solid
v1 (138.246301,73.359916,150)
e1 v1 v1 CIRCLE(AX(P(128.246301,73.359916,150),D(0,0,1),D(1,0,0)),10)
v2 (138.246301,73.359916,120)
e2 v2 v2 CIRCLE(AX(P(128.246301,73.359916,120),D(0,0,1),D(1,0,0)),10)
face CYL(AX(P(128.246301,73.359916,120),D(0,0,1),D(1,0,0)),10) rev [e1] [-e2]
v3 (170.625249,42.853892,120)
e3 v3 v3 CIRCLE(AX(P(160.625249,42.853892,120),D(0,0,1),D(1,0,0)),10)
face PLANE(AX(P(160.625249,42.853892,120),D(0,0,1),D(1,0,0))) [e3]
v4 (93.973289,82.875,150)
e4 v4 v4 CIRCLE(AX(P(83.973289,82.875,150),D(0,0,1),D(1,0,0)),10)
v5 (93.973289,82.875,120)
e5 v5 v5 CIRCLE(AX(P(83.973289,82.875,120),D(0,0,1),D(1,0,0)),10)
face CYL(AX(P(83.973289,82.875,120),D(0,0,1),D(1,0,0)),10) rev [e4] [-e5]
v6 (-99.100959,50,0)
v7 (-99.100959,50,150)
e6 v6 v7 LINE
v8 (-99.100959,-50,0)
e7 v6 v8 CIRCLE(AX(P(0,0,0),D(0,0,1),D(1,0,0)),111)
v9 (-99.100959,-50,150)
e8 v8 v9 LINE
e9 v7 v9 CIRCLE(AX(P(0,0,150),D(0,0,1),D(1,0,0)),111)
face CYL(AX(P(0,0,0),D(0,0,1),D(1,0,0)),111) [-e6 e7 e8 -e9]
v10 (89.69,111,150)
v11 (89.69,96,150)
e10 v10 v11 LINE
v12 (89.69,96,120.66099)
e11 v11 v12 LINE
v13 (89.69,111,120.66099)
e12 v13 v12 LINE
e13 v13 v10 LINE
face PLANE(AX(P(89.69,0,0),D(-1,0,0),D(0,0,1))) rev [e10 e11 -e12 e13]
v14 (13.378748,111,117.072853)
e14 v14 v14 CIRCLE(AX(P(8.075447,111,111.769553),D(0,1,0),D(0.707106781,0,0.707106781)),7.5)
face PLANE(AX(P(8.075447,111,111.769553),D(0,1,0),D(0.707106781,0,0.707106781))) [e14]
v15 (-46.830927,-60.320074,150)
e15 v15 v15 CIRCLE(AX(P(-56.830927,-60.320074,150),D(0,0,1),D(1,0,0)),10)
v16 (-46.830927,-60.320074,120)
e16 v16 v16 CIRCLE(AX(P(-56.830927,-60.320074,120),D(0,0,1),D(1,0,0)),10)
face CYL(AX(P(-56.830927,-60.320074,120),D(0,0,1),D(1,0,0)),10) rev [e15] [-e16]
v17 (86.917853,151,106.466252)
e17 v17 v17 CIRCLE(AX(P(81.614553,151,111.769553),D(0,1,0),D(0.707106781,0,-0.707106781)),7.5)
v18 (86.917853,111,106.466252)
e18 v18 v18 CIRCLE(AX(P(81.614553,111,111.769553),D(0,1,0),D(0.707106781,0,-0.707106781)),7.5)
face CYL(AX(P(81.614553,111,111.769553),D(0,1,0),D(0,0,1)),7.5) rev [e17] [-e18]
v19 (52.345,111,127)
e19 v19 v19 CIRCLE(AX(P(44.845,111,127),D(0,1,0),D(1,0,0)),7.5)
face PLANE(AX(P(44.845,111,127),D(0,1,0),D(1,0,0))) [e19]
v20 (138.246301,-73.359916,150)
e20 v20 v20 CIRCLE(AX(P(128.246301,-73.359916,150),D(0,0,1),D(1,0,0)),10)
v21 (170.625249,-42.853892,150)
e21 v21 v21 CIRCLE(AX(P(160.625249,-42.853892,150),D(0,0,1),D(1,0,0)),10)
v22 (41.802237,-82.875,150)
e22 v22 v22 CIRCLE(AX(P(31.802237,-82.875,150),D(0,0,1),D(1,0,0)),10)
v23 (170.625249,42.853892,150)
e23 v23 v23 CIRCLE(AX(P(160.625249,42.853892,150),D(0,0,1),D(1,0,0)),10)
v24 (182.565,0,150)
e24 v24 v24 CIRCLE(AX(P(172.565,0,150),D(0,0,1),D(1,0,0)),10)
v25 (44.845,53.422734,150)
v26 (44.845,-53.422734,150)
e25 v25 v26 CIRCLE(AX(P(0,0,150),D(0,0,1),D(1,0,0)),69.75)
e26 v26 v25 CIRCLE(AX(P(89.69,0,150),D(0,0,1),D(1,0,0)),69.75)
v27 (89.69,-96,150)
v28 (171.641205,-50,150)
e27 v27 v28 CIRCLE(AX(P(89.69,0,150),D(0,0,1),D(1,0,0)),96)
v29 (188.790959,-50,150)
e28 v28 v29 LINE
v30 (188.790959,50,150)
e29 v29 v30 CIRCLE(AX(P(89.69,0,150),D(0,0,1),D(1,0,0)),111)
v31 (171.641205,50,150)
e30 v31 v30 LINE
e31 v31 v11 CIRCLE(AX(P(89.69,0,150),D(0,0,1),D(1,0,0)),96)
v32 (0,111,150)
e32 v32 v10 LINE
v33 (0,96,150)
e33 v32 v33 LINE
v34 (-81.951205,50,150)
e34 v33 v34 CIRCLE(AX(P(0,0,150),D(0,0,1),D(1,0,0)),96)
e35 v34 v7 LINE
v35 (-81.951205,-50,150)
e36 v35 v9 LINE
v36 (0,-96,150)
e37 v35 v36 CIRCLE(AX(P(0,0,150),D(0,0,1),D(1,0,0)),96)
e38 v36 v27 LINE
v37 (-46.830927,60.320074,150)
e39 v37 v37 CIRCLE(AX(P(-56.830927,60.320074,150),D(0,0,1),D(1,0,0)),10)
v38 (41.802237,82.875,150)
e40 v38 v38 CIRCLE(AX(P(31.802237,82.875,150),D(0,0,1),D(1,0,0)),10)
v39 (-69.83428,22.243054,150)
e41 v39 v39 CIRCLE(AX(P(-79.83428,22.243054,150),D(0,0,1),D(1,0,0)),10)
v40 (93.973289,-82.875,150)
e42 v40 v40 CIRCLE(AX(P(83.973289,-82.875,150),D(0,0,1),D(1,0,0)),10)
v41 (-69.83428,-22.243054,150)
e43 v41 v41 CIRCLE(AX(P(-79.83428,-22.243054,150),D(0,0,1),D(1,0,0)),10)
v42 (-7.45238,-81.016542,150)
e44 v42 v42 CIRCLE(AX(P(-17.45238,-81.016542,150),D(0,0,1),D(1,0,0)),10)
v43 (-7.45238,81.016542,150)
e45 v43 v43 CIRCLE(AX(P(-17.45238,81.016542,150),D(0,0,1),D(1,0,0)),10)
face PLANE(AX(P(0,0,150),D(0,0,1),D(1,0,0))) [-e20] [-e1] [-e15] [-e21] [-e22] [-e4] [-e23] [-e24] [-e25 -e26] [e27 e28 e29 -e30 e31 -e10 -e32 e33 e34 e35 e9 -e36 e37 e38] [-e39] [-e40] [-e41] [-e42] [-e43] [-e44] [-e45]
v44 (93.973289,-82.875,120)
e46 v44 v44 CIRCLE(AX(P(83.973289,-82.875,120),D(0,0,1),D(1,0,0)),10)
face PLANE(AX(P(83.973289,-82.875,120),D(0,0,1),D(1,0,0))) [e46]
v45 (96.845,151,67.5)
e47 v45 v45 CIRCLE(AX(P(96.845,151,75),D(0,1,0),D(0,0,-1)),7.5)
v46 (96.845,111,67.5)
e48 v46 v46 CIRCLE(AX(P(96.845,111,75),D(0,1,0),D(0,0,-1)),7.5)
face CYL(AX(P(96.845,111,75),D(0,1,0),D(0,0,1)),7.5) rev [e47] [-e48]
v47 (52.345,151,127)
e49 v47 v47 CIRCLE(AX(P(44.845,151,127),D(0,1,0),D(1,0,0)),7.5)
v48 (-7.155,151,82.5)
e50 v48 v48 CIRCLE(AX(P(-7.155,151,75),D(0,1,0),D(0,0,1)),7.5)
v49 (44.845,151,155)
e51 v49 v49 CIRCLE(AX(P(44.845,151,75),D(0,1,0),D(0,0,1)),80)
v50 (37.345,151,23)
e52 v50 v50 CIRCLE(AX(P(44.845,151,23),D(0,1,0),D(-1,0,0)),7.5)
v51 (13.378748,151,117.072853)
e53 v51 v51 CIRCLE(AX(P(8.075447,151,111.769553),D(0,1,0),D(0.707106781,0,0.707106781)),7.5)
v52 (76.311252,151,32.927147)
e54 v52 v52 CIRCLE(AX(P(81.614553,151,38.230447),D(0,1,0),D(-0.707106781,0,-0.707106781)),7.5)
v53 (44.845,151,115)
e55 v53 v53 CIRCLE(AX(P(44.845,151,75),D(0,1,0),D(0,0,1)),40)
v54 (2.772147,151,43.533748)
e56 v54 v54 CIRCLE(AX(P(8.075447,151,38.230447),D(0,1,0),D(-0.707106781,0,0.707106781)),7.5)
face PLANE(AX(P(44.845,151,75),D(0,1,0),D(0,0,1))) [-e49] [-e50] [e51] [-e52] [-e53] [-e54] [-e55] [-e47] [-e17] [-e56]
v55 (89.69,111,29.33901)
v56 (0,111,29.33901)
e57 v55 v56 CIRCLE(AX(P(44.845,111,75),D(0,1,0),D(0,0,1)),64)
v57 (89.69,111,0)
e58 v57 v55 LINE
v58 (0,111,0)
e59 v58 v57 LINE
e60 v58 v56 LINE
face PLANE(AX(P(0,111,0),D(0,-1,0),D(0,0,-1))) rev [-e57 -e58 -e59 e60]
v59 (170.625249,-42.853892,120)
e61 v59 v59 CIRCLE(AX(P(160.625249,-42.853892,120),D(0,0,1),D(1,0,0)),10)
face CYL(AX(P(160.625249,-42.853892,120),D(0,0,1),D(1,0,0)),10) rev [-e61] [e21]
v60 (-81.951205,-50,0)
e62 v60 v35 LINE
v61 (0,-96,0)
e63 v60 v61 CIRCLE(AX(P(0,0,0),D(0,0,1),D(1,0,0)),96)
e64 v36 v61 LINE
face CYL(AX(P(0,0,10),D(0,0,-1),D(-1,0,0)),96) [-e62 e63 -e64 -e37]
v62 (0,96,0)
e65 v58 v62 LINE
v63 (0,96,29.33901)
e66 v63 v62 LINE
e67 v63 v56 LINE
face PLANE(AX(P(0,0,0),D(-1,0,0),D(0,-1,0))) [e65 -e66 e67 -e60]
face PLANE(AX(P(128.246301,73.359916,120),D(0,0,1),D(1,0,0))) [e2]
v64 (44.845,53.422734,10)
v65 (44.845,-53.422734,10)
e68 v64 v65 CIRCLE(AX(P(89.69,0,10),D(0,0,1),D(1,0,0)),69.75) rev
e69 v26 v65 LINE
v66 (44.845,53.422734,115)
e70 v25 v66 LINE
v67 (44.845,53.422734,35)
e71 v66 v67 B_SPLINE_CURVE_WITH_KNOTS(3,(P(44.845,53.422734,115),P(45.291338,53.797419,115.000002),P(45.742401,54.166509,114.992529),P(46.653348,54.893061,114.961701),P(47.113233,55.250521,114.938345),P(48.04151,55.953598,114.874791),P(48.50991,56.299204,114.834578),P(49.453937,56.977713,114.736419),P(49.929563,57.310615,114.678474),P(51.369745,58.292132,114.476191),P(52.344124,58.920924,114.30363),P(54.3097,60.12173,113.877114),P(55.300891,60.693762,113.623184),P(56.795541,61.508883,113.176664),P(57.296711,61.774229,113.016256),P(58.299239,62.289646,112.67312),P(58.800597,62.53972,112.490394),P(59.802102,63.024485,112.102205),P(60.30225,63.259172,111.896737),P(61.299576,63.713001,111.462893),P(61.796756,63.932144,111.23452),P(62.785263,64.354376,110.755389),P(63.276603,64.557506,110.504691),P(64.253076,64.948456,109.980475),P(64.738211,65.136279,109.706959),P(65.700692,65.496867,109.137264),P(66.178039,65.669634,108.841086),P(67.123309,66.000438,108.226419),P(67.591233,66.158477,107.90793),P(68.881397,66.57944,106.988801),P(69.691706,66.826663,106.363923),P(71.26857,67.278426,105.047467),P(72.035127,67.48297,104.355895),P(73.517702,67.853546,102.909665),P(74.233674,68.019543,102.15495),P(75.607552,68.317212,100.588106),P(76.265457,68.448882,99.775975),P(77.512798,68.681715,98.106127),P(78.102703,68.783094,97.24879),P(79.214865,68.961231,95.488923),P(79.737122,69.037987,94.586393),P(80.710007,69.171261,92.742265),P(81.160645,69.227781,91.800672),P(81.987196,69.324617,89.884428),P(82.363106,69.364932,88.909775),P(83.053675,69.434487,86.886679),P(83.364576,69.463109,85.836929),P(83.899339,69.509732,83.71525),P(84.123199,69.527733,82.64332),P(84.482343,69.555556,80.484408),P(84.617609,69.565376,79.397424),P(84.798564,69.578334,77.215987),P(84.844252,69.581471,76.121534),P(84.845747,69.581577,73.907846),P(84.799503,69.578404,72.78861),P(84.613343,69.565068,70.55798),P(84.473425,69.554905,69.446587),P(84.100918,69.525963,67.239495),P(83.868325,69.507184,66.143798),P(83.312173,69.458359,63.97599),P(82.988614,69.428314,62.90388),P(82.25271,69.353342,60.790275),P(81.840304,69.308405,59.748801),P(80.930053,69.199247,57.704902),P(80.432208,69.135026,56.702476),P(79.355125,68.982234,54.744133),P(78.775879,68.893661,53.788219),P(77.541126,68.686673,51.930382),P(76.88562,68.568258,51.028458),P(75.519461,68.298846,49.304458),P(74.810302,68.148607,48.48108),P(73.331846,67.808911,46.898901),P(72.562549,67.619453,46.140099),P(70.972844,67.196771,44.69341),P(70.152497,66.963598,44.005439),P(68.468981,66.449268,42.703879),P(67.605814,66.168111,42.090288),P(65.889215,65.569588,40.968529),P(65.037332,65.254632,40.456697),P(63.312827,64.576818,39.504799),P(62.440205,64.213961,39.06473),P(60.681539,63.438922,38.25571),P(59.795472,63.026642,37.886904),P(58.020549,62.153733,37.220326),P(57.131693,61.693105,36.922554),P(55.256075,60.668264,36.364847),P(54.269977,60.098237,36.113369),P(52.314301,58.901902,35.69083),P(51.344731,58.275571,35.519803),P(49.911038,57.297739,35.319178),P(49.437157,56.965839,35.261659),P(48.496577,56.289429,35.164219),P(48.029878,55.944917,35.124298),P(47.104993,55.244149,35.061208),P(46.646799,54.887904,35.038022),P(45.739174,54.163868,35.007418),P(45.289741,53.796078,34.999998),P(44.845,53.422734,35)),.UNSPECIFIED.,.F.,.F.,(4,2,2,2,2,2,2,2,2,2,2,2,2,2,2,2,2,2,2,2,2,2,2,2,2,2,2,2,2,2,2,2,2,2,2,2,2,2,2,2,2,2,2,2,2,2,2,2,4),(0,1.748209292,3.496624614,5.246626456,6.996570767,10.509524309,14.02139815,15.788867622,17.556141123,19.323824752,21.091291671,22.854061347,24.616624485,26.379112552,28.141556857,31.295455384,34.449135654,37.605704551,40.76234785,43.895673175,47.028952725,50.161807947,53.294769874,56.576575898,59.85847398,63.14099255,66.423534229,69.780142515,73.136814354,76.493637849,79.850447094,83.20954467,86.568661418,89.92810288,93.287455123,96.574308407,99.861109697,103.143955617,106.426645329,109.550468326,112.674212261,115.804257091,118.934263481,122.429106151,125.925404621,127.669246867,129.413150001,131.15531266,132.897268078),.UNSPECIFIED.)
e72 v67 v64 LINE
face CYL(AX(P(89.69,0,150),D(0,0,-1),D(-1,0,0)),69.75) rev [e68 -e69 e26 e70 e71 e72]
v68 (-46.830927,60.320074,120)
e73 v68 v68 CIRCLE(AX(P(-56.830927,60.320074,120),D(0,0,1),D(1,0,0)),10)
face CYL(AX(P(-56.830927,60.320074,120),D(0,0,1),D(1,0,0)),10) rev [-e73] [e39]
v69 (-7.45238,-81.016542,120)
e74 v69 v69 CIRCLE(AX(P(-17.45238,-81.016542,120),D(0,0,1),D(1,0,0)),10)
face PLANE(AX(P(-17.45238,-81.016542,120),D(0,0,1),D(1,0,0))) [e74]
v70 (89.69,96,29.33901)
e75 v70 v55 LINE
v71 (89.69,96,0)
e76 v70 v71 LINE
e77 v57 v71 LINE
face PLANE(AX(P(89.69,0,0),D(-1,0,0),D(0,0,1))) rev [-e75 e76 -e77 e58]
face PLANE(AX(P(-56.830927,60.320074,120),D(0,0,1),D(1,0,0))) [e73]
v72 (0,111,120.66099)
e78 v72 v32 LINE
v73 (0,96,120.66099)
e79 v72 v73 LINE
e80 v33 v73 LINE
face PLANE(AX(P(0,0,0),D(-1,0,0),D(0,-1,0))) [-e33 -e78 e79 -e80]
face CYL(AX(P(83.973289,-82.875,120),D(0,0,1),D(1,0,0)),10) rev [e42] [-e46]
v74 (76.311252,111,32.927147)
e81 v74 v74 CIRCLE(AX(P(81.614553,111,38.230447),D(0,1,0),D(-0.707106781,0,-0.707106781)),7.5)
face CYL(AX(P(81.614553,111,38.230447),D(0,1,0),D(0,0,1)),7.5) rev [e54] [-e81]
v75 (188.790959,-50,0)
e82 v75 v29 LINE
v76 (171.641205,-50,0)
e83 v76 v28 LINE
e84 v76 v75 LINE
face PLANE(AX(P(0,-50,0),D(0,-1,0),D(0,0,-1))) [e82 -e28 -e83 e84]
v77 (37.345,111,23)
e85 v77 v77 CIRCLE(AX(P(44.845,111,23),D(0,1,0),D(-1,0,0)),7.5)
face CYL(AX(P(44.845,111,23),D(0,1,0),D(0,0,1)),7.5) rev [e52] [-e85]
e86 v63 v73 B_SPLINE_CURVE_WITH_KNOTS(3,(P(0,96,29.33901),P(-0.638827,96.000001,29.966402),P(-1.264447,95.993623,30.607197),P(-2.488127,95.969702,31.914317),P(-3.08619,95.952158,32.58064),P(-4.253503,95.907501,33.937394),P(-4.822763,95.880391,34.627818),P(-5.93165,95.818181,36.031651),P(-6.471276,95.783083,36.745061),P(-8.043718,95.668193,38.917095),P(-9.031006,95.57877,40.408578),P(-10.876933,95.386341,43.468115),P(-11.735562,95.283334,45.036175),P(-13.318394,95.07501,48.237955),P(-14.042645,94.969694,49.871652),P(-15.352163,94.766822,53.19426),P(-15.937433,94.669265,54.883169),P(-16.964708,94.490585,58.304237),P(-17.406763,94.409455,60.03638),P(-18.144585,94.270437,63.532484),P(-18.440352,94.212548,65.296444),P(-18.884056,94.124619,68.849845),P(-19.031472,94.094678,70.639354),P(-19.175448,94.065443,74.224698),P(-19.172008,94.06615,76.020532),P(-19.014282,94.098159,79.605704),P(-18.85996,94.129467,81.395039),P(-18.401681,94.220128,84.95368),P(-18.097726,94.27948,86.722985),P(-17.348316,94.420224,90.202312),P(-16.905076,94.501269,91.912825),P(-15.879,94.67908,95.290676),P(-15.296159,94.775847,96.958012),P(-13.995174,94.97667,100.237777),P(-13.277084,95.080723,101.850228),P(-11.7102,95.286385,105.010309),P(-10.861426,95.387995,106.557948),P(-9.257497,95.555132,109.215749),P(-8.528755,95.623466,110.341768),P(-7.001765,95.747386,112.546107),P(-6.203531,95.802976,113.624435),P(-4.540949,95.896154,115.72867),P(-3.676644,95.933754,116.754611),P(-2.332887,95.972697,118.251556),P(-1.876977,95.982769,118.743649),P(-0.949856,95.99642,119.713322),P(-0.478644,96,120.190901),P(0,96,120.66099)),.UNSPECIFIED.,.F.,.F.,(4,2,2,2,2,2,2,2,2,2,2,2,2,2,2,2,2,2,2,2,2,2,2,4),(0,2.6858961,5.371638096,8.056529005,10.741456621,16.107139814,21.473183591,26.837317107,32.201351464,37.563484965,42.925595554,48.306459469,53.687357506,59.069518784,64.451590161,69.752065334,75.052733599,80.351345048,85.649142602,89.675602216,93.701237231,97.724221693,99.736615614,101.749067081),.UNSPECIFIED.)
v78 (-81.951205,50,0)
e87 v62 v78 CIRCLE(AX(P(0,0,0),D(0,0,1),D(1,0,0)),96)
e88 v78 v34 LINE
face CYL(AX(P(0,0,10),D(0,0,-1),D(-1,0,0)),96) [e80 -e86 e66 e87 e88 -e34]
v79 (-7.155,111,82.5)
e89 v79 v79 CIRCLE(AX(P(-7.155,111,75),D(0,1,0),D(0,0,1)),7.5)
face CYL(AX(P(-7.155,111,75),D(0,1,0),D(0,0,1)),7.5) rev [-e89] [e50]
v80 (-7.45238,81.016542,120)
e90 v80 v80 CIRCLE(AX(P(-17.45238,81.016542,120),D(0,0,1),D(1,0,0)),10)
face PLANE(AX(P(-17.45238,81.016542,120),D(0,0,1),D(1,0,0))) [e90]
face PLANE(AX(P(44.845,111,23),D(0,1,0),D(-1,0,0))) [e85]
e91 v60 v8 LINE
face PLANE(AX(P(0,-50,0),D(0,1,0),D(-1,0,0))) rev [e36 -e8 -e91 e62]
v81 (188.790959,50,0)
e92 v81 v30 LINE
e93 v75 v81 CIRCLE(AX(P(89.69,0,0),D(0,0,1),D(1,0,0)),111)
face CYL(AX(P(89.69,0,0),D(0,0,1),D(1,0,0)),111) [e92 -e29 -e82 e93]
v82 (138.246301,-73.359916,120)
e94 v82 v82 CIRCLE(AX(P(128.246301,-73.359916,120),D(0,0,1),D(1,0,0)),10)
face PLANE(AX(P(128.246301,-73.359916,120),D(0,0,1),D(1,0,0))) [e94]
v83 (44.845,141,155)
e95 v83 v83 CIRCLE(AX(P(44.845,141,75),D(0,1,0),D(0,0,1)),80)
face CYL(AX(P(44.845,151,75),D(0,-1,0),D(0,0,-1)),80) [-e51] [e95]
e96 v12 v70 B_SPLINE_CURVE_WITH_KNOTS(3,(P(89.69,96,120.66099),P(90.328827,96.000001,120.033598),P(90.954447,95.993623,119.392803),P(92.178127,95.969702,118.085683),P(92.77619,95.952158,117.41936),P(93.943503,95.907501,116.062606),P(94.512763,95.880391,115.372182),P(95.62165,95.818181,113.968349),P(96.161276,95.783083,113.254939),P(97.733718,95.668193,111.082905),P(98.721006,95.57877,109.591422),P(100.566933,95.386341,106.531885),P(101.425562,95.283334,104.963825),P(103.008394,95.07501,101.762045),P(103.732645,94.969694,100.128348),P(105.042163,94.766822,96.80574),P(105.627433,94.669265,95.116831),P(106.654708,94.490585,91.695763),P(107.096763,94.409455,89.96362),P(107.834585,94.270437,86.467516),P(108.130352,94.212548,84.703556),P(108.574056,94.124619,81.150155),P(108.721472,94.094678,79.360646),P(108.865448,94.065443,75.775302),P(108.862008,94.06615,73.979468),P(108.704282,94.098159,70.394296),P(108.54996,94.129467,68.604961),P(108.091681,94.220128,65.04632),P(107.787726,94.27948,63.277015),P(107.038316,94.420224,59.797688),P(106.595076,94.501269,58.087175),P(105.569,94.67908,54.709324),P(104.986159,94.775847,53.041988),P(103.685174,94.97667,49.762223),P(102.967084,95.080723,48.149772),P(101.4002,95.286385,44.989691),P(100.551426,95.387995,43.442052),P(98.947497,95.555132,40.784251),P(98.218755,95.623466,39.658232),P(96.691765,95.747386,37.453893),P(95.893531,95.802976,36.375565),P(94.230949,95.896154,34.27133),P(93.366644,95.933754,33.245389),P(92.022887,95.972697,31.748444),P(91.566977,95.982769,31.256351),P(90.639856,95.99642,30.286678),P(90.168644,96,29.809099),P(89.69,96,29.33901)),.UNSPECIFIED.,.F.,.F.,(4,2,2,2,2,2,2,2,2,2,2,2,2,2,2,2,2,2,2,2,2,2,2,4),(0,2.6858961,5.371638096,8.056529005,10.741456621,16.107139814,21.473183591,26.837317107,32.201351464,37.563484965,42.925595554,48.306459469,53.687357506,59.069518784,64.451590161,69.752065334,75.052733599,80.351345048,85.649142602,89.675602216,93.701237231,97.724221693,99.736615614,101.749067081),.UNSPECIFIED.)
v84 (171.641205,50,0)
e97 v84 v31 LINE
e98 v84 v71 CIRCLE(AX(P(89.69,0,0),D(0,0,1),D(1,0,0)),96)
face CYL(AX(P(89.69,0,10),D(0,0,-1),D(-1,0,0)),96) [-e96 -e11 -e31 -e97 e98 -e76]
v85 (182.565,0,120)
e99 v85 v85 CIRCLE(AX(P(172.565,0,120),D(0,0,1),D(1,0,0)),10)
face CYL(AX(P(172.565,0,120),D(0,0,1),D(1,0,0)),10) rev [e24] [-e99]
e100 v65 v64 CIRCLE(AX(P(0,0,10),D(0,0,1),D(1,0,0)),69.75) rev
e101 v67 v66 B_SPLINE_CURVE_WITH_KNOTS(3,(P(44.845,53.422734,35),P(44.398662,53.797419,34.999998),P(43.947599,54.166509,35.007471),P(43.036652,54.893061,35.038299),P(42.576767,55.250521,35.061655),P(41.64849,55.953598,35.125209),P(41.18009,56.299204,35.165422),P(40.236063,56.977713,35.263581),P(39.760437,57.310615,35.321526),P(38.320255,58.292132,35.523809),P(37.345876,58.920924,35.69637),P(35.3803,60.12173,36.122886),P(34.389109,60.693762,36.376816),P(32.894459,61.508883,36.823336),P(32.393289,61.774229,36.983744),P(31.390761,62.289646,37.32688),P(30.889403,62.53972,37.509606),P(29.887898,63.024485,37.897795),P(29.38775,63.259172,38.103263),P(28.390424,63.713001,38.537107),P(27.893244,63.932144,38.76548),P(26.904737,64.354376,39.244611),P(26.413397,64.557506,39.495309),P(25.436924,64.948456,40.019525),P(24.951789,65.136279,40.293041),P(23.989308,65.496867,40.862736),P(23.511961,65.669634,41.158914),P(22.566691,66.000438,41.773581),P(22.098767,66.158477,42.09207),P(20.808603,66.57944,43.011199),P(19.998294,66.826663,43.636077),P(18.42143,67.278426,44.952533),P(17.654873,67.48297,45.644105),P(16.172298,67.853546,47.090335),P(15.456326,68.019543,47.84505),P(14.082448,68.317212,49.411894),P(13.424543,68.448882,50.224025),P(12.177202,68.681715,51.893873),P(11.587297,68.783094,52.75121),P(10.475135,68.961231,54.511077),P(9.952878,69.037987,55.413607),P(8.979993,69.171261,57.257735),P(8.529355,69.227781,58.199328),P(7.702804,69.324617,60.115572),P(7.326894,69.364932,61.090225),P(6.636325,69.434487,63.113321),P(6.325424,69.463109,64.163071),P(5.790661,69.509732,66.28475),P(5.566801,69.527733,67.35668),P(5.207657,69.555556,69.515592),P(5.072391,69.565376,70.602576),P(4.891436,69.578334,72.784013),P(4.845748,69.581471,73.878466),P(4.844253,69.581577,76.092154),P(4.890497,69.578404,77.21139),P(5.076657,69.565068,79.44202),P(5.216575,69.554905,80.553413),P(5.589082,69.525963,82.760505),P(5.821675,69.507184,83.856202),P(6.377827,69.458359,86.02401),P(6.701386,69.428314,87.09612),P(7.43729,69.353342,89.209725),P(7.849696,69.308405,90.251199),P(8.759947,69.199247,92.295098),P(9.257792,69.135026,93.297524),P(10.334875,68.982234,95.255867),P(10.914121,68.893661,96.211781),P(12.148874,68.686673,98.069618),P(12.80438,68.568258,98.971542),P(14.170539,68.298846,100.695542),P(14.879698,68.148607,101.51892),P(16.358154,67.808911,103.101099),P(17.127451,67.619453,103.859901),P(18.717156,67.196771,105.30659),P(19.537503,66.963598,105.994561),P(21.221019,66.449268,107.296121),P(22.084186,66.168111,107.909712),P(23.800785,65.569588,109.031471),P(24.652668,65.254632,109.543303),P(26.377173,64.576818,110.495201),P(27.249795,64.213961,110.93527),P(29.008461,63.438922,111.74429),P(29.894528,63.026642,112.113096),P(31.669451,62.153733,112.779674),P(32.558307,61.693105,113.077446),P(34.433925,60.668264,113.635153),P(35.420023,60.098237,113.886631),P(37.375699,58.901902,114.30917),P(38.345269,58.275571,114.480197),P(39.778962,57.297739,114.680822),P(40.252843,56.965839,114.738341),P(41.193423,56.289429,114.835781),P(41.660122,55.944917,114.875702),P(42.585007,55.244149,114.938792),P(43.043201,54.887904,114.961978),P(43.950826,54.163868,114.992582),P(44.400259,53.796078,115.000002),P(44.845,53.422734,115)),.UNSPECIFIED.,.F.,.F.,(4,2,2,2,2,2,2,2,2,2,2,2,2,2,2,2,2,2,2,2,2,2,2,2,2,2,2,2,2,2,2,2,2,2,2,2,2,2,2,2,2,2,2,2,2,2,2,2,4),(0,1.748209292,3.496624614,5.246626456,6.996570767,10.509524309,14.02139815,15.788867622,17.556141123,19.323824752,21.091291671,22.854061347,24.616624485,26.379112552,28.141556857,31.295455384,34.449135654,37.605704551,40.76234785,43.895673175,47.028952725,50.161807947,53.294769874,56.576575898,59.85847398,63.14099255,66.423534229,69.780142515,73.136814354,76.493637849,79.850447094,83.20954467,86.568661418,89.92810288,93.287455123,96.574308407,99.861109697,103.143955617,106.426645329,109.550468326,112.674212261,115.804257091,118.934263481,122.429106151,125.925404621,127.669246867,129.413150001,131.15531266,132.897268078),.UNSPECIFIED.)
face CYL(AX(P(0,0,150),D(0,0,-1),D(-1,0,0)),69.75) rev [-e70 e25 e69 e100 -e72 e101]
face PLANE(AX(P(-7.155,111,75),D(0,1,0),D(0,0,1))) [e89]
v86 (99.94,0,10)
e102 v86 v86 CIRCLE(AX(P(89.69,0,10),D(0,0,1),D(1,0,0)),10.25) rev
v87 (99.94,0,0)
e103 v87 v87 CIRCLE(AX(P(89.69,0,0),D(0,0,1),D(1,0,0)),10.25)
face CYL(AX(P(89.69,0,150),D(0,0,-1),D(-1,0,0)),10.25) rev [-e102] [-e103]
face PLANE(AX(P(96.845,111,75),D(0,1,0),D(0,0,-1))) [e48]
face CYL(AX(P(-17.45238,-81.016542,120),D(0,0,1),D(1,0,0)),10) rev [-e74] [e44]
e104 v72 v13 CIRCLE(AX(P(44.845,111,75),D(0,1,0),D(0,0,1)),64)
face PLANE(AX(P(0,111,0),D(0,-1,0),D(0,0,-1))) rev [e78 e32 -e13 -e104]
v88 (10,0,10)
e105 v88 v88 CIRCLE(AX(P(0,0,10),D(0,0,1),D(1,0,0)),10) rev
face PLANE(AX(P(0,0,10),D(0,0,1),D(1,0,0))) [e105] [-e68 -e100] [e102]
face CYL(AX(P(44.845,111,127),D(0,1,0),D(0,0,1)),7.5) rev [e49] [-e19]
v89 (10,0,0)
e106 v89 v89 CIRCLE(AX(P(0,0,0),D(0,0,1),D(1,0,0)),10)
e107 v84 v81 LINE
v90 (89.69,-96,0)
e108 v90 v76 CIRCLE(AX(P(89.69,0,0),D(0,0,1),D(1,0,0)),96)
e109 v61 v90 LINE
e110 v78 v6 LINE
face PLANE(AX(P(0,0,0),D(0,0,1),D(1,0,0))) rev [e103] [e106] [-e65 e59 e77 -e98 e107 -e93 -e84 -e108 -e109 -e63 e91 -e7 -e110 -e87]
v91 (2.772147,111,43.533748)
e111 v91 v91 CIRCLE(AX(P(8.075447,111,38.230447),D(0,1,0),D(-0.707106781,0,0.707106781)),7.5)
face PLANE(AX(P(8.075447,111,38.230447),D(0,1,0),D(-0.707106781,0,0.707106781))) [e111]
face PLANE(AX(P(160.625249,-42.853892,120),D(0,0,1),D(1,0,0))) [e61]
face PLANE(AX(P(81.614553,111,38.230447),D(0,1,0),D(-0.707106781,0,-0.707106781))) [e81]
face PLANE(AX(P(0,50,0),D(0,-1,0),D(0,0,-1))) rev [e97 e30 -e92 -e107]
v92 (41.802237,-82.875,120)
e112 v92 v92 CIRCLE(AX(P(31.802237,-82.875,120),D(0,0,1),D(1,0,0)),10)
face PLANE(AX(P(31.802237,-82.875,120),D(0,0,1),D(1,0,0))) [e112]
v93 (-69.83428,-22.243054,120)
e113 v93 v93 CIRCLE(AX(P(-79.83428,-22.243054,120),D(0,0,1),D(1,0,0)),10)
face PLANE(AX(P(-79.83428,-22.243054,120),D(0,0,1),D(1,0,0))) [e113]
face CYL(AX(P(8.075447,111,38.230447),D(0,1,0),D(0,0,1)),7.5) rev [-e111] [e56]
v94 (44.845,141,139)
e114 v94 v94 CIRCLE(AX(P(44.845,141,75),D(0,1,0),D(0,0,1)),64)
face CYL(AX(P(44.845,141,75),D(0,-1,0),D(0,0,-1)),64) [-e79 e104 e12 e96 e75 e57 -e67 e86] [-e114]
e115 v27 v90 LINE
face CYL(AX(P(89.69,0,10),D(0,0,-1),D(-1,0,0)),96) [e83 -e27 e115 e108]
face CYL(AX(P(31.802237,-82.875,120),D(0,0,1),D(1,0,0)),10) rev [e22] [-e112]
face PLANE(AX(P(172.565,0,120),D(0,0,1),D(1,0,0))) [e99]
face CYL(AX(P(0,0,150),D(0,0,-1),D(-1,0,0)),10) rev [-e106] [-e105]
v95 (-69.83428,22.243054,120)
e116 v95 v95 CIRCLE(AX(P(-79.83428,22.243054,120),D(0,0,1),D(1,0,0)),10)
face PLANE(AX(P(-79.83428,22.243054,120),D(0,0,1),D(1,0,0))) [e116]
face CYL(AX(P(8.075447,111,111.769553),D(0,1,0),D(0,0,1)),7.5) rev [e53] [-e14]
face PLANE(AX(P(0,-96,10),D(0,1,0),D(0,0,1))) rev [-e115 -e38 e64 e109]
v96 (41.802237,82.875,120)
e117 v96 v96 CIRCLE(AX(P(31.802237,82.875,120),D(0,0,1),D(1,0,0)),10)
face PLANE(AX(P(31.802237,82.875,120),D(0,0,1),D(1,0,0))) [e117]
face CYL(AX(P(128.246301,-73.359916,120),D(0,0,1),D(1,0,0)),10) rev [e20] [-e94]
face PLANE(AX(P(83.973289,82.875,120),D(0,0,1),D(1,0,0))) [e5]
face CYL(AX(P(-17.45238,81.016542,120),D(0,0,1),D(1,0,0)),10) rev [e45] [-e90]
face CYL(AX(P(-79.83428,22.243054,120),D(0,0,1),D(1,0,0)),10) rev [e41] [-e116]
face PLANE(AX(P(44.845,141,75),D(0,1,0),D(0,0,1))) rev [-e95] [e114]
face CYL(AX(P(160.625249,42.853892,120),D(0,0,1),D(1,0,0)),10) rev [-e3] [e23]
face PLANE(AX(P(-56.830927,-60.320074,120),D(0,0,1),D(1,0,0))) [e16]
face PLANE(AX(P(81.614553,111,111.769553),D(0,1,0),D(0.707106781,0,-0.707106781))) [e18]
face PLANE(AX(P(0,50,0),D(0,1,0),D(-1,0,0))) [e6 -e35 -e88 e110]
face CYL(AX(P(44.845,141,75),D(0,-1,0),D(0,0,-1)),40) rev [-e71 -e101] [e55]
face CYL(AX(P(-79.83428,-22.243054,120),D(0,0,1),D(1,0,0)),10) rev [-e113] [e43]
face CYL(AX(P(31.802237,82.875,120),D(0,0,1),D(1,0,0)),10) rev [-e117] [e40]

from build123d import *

# Parameters (mm, degrees)
BOSS_EXTRUDE1_DEPTH   = 10
BOSS_EXTRUDE4_DEPTH   = 150
SKETCH2_5_R           = 10
SKETCH2_5_R_2         = 10.25
CUT_EXTRUDE2_DEPTH    = 258.287342
BOSS_EXTRUDE5_START   = -150
SKETCH4_W             = 89.69
SKETCH4_H             = 15
BOSS_EXTRUDE5_DEPTH   = 150
SKETCH5_R             = 10
CUT_EXTRUDE10_DEPTH   = 30
CRVPATTERN1_START     = 120
CRVPATTERN1_OUTLINE_R = 10
CRVPATTERN1_DEPTH     = 30
BOSS_EXTRUDE6_START   = -16.9304
SKETCH7_R             = 64
SKETCH7_R_2           = 40
BOSS_EXTRUDE6_DEPTH   = 46.9304
CUT_EXTRUDE11_REACH   = 327.001
SKETCH8_R             = 80
SKETCH8_R_2           = 40
BOSS_EXTRUDE7_DEPTH   = 10
SKETCH9_R             = 7.5
CUT_EXTRUDE12_DEPTH   = 40
CIRPATTERN1_COUNT     = 8


# Read off the part's stored shape, not the designer's step: CrvPattern1
with BuildPart() as part:
    # Sketch1 → Boss-Extrude1 (new body)
    with BuildSketch(Plane.XY):
        with BuildLine():
            Line((0, 96), (89.69, 96))
            ThreePointArc((89.69, 96), (185.69, 0), (89.69, -96))
            Line((89.69, -96), (0, -96))
            ThreePointArc((0, -96), (-96, 0), (0, 96))
        make_face()
    extrude(amount=BOSS_EXTRUDE1_DEPTH)

    # Sketch2 → Boss-Extrude4 (add)
    with BuildSketch(Plane.XY):
        with BuildLine():
            ThreePointArc((89.69, -96), (185.69, 0), (89.69, 96))
            Line((89.69, 96), (0, 96))
            ThreePointArc((0, 96), (-96, 0), (0, -96))
            Line((0, -96), (89.69, -96))
        make_face()
        with BuildLine():
            ThreePointArc((44.845, -53.422734), (-69.75, 0), (44.845, 53.422734))
            ThreePointArc((44.845, 53.422734), (119.161374, 63.217882), (159.44, 0))
            ThreePointArc((159.44, 0), (119.161374, -63.217882), (44.845, -53.422734))
        make_face(mode=Mode.SUBTRACT)
    extrude(amount=BOSS_EXTRUDE4_DEPTH)

    # Sketch2<5> → Cut-Extrude2 (cut, through all)
    with BuildSketch(Plane.XY):
        Circle(SKETCH2_5_R)
        with Locations((89.69, 0)):
            Circle(SKETCH2_5_R_2)
    extrude(amount=CUT_EXTRUDE2_DEPTH, mode=Mode.SUBTRACT)

    # Sketch4 → Boss-Extrude5 (add)
    with BuildSketch(Plane.XY.offset(150).offset(BOSS_EXTRUDE5_START)):
        with Locations((44.845, 103.5)):
            Rectangle(SKETCH4_W, SKETCH4_H)
        with BuildLine():
            Line((-81.951205, 50), (-99.100959, 50))
            ThreePointArc((-99.100959, 50), (-111, 0), (-99.100959, -50))
            Line((-99.100959, -50), (-81.951205, -50))
            ThreePointArc((-81.951205, -50), (-96, 0), (-81.951205, 50))
        make_face()
        with BuildLine():
            ThreePointArc((188.790959, -50), (200.69, 0), (188.790959, 50))
            Line((188.790959, 50), (171.641205, 50))
            ThreePointArc((171.641205, 50), (185.69, 0), (171.641205, -50))
            Line((171.641205, -50), (188.790959, -50))
        make_face()
    extrude(amount=BOSS_EXTRUDE5_DEPTH)

    # Sketch5 → Cut-Extrude10 (cut)
    with BuildSketch(Plane.XY.offset(150)):
        with Locations((172.565, 0)):
            Circle(SKETCH5_R)
    extrude(amount=-CUT_EXTRUDE10_DEPTH, mode=Mode.SUBTRACT)

    # CrvPattern1 outline → CrvPattern1 (cut)
    with BuildSketch(Plane.XY.offset(CRVPATTERN1_START)):
        with Locations((160.625249, 42.853892)):
            Circle(CRVPATTERN1_OUTLINE_R)
        with Locations((160.625249, -42.853892)):
            Circle(CRVPATTERN1_OUTLINE_R)
        with Locations((128.246301, -73.359916)):
            Circle(CRVPATTERN1_OUTLINE_R)
        with Locations((83.973289, -82.875)):
            Circle(CRVPATTERN1_OUTLINE_R)
        with Locations((31.802237, -82.875)):
            Circle(CRVPATTERN1_OUTLINE_R)
        with Locations((-17.45238, -81.016542)):
            Circle(CRVPATTERN1_OUTLINE_R)
        with Locations((-56.830927, -60.320074)):
            Circle(CRVPATTERN1_OUTLINE_R)
        with Locations((-79.83428, -22.243054)):
            Circle(CRVPATTERN1_OUTLINE_R)
        with Locations((-79.83428, 22.243054)):
            Circle(CRVPATTERN1_OUTLINE_R)
        with Locations((-56.830927, 60.320074)):
            Circle(CRVPATTERN1_OUTLINE_R)
        with Locations((-17.45238, 81.016542)):
            Circle(CRVPATTERN1_OUTLINE_R)
        with Locations((31.802237, 82.875)):
            Circle(CRVPATTERN1_OUTLINE_R)
        with Locations((83.973289, 82.875)):
            Circle(CRVPATTERN1_OUTLINE_R)
        with Locations((128.246301, 73.359916)):
            Circle(CRVPATTERN1_OUTLINE_R)
    extrude(amount=CRVPATTERN1_DEPTH, mode=Mode.SUBTRACT)

    # Sketch7 → Boss-Extrude6 (add)
    with BuildSketch(Plane(origin=(0, 111, 0), x_dir=(1, 0, 0), z_dir=(0, 1, 0)).offset(BOSS_EXTRUDE6_START)):
        with Locations(Location((44.845, -75, 0), (0, 0, 134.483443))):
            Circle(SKETCH7_R)
        with Locations(Location((44.845, -75, 0), (0, 0, 270))):
            Circle(SKETCH7_R_2, mode=Mode.SUBTRACT)
    extrude(amount=BOSS_EXTRUDE6_DEPTH)

    # Sketch7<2> → Cut-Extrude11 (cut, up to next)
    with BuildSketch(Plane(origin=(0, 111, 0), x_dir=(1, 0, 0), z_dir=(0, 1, 0)), mode=Mode.PRIVATE) as cut_extrude11_sk1:
        with BuildLine():
            ThreePointArc((84.845, -75), (79.637998, -55.265582), (65.372637, -40.669021))
            Line((65.372637, -40.669021), (24.317363, -109.330979))
            ThreePointArc((24.317363, -109.330979), (64.579418, -109.792998), (84.845, -75))
        make_face()
    cut_extrude11_tool1 = extrude(cut_extrude11_sk1.sketch, amount=-CUT_EXTRUDE11_REACH, mode=Mode.PRIVATE) & part.part
    # Sketch7<2> → Cut-Extrude11 (cut, up to next)
    with BuildSketch(Plane(origin=(0, 111, 0), x_dir=(1, 0, 0), z_dir=(0, 1, 0)), mode=Mode.PRIVATE) as cut_extrude11_sk2:
        with BuildLine():
            Line((24.317363, -109.330979), (65.372637, -40.669021))
            ThreePointArc((65.372637, -40.669021), (10.514021, -54.472363), (24.317363, -109.330979))
        make_face()
    cut_extrude11_tool2 = extrude(cut_extrude11_sk2.sketch, amount=-CUT_EXTRUDE11_REACH, mode=Mode.PRIVATE) & part.part
    # Sketch7<2> → Cut-Extrude11 (cut, up to next)
    with BuildSketch(Plane(origin=(0, 111, 0), x_dir=(1, 0, 0), z_dir=(0, 1, 0)), mode=Mode.PRIVATE) as cut_extrude11_sk3:
        with BuildLine():
            ThreePointArc((84.845, -75), (79.637998, -55.265582), (65.372637, -40.669021))
            Line((65.372637, -40.669021), (24.317363, -109.330979))
            ThreePointArc((24.317363, -109.330979), (64.579418, -109.792998), (84.845, -75))
        make_face()
    cut_extrude11_tool3 = extrude(cut_extrude11_sk3.sketch, amount=-CUT_EXTRUDE11_REACH, mode=Mode.PRIVATE) & part.part
    # Sketch7<2> → Cut-Extrude11 (cut, up to next)
    with BuildSketch(Plane(origin=(0, 111, 0), x_dir=(1, 0, 0), z_dir=(0, 1, 0)), mode=Mode.PRIVATE) as cut_extrude11_sk4:
        with BuildLine():
            Line((24.317363, -109.330979), (65.372637, -40.669021))
            ThreePointArc((65.372637, -40.669021), (10.514021, -54.472363), (24.317363, -109.330979))
        make_face()
    cut_extrude11_tool4 = extrude(cut_extrude11_sk4.sketch, amount=-CUT_EXTRUDE11_REACH, mode=Mode.PRIVATE) & part.part
    add(cut_extrude11_tool1.solids().sort_by_distance((59.41552, 111, 83.7122))[0], mode=Mode.SUBTRACT)
    add(cut_extrude11_tool2.solids().sort_by_distance((30.27448, 111, 66.2878))[0], mode=Mode.SUBTRACT)
    add(cut_extrude11_tool3.solids().sort_by_distance((59.41552, 111, 83.7122))[0], mode=Mode.SUBTRACT)
    add(cut_extrude11_tool4.solids().sort_by_distance((30.27448, 111, 66.2878))[0], mode=Mode.SUBTRACT)

    # Sketch8 → Boss-Extrude7 (add)
    with BuildSketch(Plane(origin=(0, 141, 0), x_dir=(1, 0, 0), z_dir=(0, 1, 0))):
        with Locations(Location((44.845, -75, 0), (0, 0, 270))):
            Circle(SKETCH8_R)
        with Locations(Location((44.845, -75, 0), (0, 0, 270))):
            Circle(SKETCH8_R_2, mode=Mode.SUBTRACT)
    extrude(amount=BOSS_EXTRUDE7_DEPTH)

    # Sketch9 → Cut-Extrude12 (cut)
    with BuildSketch(Plane(origin=(0, 151, 0), x_dir=(1, 0, 0), z_dir=(0, 1, 0))):
        with Locations(Location((-7.155, -75, 0), (0, 0, 270))):
            Circle(SKETCH9_R)
    cut_extrude12 = extrude(amount=-CUT_EXTRUDE12_DEPTH, mode=Mode.SUBTRACT)

    # CirPattern1: Cut-Extrude12 ×8 about axis
    cirpattern1_axis = Axis((44.845, 0, 75), (0, 1, 0))
    for i in range(1, CIRPATTERN1_COUNT):
        add(cut_extrude12.rotate(cirpattern1_axis, i * 360 / CIRPATTERN1_COUNT), mode=Mode.SUBTRACT)


solid = part.part
